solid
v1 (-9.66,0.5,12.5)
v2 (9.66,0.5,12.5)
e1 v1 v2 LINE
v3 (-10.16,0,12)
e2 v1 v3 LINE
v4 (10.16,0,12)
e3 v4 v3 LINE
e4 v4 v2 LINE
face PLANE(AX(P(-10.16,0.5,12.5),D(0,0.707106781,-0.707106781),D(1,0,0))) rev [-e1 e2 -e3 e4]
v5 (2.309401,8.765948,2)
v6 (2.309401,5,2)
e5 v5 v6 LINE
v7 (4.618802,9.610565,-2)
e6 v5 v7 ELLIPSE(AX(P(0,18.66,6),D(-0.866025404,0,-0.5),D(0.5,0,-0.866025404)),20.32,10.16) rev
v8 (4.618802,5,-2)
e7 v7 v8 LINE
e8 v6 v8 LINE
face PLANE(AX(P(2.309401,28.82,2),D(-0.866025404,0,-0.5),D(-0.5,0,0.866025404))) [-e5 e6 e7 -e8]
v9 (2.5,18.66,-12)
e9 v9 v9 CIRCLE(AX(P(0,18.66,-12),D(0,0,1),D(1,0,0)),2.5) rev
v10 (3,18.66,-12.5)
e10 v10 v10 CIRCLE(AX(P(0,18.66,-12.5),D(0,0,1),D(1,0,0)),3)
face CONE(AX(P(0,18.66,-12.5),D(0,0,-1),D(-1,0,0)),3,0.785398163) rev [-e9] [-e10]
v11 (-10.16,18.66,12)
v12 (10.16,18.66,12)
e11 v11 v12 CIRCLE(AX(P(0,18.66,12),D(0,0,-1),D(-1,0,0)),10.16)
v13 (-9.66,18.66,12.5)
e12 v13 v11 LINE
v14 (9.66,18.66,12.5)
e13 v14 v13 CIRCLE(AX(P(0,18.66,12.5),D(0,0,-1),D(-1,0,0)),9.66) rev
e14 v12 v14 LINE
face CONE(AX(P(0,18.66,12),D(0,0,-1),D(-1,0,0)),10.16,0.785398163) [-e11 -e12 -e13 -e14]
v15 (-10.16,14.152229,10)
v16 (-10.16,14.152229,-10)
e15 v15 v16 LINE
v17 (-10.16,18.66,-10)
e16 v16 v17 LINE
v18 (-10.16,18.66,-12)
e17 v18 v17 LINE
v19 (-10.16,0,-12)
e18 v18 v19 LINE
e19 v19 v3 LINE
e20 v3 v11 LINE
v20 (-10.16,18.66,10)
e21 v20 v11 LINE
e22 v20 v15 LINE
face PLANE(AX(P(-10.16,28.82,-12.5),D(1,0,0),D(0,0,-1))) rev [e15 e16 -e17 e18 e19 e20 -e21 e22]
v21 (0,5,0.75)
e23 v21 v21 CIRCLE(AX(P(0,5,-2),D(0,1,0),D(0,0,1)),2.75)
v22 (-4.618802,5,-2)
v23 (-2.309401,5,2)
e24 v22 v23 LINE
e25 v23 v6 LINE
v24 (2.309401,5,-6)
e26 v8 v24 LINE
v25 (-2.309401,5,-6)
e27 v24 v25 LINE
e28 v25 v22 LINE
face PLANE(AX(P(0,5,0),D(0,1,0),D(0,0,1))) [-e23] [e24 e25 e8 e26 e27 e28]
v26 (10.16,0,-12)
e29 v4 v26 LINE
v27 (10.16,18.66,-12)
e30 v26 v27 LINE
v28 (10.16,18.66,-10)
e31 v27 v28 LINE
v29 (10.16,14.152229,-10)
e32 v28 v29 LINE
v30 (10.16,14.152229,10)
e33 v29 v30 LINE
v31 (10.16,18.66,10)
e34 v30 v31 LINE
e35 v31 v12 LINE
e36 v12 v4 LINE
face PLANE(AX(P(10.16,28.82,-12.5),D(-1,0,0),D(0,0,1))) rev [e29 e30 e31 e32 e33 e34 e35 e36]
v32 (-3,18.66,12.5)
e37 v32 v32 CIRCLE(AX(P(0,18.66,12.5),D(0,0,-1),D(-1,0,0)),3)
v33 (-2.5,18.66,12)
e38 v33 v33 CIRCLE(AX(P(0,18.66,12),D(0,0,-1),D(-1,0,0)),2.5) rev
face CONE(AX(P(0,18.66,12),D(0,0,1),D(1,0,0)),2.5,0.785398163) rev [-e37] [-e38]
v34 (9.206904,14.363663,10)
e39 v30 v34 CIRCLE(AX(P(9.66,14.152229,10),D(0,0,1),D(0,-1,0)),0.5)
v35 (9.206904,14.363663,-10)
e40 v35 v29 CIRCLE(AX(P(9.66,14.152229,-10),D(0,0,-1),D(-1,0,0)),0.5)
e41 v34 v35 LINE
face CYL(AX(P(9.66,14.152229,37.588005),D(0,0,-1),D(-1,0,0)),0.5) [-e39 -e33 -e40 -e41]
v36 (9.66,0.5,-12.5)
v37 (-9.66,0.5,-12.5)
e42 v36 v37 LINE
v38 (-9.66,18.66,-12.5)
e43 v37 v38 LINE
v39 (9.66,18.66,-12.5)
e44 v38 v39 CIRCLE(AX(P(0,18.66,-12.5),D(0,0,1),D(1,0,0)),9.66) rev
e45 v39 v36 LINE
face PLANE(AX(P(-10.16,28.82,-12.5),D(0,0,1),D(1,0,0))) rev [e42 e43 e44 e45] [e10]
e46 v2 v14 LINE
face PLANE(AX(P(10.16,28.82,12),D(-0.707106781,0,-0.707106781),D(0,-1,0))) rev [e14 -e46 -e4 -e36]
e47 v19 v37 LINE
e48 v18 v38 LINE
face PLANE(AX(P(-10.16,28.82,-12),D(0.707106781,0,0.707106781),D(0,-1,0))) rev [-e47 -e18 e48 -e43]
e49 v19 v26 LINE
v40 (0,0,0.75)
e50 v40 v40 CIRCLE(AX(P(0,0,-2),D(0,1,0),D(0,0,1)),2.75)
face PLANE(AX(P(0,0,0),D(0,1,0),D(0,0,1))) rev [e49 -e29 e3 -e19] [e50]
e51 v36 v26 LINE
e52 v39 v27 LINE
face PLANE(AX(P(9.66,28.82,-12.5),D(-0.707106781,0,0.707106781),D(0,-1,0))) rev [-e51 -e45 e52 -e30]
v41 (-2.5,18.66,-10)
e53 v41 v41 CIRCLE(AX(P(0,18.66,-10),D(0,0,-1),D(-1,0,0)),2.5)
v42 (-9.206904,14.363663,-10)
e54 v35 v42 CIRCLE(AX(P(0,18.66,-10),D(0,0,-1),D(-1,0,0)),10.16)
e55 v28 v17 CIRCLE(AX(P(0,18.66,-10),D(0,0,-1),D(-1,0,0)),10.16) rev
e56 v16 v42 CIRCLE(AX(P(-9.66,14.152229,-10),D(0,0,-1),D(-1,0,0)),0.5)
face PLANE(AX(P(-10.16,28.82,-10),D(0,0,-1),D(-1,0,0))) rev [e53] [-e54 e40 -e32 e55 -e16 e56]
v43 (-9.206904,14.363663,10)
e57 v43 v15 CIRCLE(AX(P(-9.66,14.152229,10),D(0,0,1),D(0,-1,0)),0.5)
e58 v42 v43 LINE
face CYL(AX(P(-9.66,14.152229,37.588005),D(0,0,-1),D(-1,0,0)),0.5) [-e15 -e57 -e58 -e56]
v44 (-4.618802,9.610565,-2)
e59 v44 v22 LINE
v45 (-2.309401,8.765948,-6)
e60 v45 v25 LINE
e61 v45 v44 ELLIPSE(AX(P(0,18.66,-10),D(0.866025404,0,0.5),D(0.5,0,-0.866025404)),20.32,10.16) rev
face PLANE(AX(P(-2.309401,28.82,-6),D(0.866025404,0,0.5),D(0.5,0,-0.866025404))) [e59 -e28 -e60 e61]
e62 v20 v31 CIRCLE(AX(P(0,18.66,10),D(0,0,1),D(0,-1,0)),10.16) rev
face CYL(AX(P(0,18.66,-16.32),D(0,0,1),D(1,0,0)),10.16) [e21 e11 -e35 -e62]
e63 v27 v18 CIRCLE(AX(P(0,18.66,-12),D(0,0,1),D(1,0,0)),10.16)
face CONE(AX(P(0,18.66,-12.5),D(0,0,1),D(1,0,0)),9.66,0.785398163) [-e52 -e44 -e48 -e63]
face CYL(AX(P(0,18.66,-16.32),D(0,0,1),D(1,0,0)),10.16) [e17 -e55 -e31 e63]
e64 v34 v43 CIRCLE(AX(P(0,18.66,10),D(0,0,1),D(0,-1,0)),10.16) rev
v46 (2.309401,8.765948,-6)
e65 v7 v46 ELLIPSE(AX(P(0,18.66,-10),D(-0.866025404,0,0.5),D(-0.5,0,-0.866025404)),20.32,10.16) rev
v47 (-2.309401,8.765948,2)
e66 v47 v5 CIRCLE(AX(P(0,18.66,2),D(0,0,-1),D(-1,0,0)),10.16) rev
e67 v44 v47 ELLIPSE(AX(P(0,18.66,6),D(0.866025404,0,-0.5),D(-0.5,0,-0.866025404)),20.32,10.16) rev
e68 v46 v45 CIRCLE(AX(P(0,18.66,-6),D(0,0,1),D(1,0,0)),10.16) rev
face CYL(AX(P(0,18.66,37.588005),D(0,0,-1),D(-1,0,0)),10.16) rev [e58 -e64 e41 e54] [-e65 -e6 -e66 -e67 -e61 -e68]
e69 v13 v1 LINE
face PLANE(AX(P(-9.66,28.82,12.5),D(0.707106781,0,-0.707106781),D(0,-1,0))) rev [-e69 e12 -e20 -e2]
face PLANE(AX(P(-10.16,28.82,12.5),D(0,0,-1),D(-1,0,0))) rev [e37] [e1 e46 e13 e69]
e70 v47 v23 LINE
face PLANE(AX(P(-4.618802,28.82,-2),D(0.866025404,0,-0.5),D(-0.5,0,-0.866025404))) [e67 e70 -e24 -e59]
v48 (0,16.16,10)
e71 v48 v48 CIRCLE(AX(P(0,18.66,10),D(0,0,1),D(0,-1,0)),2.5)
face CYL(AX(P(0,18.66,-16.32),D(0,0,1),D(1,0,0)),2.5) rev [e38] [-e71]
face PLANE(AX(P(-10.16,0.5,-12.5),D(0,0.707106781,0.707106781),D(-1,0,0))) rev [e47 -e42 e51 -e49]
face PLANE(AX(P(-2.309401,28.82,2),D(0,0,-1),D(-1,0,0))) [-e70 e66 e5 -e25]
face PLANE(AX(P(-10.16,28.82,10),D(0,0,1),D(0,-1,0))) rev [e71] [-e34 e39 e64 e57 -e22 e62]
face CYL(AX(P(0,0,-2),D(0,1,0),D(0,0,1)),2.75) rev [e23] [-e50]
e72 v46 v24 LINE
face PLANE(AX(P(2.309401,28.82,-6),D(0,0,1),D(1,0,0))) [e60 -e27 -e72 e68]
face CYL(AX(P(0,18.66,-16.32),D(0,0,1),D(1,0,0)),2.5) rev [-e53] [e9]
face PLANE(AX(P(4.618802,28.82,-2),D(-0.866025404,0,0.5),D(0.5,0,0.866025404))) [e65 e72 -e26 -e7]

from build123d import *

# Parameters (mm, degrees)
SKETCH1_W               = 20.32
SKETCH1_H               = 25
BOSS_EXTRUDE1_DEPTH     = 28.82
SKETCH2_W               = 20
SKETCH2_H               = 20.32
CUT_EXTRUDE1_DEPTH      = 38.413163459
SKETCH3_R               = 2.5
CUT_EXTRUDE2_DEPTH      = 28.82
BOSS_EXTRUDE2_START     = 20
BOSS_EXTRUDE2_DEPTH     = 20
FILLET1_START           = -10
FILLET1_DEPTH           = 20
CUT_EXTRUDE3_DEPTH      = 34.016177853
CUT_EXTRUDE3_DEPTH_BACK = 3.5
CUT_EXTRUDE3_START      = 8.5
SKETCH5_R               = 2.75
CUT_EXTRUDE4_DEPTH      = 29.755312553
CHAMFER1_SIZE           = 0.5


with BuildPart() as part:
    # Sketch1 → Boss-Extrude1 (new body)
    with BuildSketch(Plane(origin=(0, 0, 0), x_dir=(1, 0, 0), z_dir=(0, 1, 0))):
        Rectangle(SKETCH1_W, SKETCH1_H)
    extrude(amount=BOSS_EXTRUDE1_DEPTH)

    # Sketch2 → Cut-Extrude1 (cut, through all)
    with BuildSketch(Plane(origin=(10.16, 0, 0), x_dir=(0, 0, -1), z_dir=(1, 0, 0))):
        with Locations((0, 18.66)):
            Rectangle(SKETCH2_W, SKETCH2_H)
    extrude(amount=-CUT_EXTRUDE1_DEPTH, mode=Mode.SUBTRACT)

    # Sketch3 → Cut-Extrude2 (cut)
    with BuildSketch(Plane.XY.offset(12.5)):
        with Locations((0, 18.66)):
            Circle(SKETCH3_R)
        with BuildLine():
            Line((-10.16, 18.66), (-10.16, 30.66))
            Line((-10.16, 30.66), (10.16, 30.66))
            Line((10.16, 30.66), (10.16, 18.66))
            ThreePointArc((10.16, 18.66), (0, 28.82), (-10.16, 18.66))
        make_face()
    extrude(amount=-CUT_EXTRUDE2_DEPTH, mode=Mode.SUBTRACT)

    # Sketch7 → Boss-Extrude2 (add)
    with BuildSketch(Plane.XY.offset(-10).offset(BOSS_EXTRUDE2_START)):
        with BuildLine():
            Line((10.16, 18.66), (10.16, 0))
            Line((10.16, 0), (-10.16, 0))
            Line((-10.16, 0), (-10.16, 18.66))
            ThreePointArc((-10.16, 18.66), (0, 8.5), (10.16, 18.66))
        make_face()
    extrude(amount=-BOSS_EXTRUDE2_DEPTH)

    # Fillet1: read off the stored shape, not the designer's step
    # Fillet1 outline → Fillet1 (cut)
    with BuildSketch(Plane.XY.offset(FILLET1_START)):
        with BuildLine():
            ThreePointArc((10.16, 18.66), (9.918864548, 16.459607744), (9.206904315, 14.363662847))
            ThreePointArc((9.206904315, 14.363662847), (9.76828702, 14.64036203), (10.16, 14.152228932))
            Line((10.16, 14.152228932), (10.16, 18.66))
        make_face()
        with BuildLine():
            ThreePointArc((-10.16, 14.152228932), (-9.76828702, 14.64036203), (-9.206904315, 14.363662847))
            ThreePointArc((-9.206904315, 14.363662847), (-9.918864548, 16.459607744), (-10.16, 18.66))
            Line((-10.16, 18.66), (-10.16, 14.152228932))
        make_face()
    extrude(amount=FILLET1_DEPTH, mode=Mode.SUBTRACT)

    # Sketch4 → Cut-Extrude3 (cut, two sides: drawn at the far end of the back side and taken through both)
    with BuildSketch(Plane(origin=(0, 0, 0), x_dir=(1, 0, 0), z_dir=(0, 1, 0)).offset(CUT_EXTRUDE3_START - CUT_EXTRUDE3_DEPTH_BACK)):
        Polygon((4.618802154, 2), (2.309401077, 6), (-2.309401077, 6), (-4.618802154, 2), (-2.309401077, -2), (2.309401077, -2), align=None)
    extrude(amount=CUT_EXTRUDE3_DEPTH + CUT_EXTRUDE3_DEPTH_BACK, mode=Mode.SUBTRACT)

    # Sketch5 → Cut-Extrude4 (cut, through all)
    with BuildSketch(Plane(origin=(0, 5, 0), x_dir=(1, 0, 0), z_dir=(0, 1, 0))):
        with Locations(Location((0, 2, 0), (0, 0, 270))):
            Circle(SKETCH5_R)
    extrude(amount=-CUT_EXTRUDE4_DEPTH, mode=Mode.SUBTRACT)

    # Chamfer1
    chamfer1_edges = [part.edges().sort_by_distance(p)[0] for p in [
        (10.16, 9.33, 12.5),
        (-10.16, 9.33, 12.5),
        (-10.16, 9.33, -12.5),
        (10.16, 9.33, -12.5),
        (-2.5, 18.66, -12.5),
        (-2.5, 18.66, 12.5),
        (0, 28.82, 12.5),
        (0, 28.82, -12.5),
        (0, 0, 12.5),
        (0, 0, -12.5),
    ]]
    chamfer(chamfer1_edges, length=CHAMFER1_SIZE)


solid = part.part
